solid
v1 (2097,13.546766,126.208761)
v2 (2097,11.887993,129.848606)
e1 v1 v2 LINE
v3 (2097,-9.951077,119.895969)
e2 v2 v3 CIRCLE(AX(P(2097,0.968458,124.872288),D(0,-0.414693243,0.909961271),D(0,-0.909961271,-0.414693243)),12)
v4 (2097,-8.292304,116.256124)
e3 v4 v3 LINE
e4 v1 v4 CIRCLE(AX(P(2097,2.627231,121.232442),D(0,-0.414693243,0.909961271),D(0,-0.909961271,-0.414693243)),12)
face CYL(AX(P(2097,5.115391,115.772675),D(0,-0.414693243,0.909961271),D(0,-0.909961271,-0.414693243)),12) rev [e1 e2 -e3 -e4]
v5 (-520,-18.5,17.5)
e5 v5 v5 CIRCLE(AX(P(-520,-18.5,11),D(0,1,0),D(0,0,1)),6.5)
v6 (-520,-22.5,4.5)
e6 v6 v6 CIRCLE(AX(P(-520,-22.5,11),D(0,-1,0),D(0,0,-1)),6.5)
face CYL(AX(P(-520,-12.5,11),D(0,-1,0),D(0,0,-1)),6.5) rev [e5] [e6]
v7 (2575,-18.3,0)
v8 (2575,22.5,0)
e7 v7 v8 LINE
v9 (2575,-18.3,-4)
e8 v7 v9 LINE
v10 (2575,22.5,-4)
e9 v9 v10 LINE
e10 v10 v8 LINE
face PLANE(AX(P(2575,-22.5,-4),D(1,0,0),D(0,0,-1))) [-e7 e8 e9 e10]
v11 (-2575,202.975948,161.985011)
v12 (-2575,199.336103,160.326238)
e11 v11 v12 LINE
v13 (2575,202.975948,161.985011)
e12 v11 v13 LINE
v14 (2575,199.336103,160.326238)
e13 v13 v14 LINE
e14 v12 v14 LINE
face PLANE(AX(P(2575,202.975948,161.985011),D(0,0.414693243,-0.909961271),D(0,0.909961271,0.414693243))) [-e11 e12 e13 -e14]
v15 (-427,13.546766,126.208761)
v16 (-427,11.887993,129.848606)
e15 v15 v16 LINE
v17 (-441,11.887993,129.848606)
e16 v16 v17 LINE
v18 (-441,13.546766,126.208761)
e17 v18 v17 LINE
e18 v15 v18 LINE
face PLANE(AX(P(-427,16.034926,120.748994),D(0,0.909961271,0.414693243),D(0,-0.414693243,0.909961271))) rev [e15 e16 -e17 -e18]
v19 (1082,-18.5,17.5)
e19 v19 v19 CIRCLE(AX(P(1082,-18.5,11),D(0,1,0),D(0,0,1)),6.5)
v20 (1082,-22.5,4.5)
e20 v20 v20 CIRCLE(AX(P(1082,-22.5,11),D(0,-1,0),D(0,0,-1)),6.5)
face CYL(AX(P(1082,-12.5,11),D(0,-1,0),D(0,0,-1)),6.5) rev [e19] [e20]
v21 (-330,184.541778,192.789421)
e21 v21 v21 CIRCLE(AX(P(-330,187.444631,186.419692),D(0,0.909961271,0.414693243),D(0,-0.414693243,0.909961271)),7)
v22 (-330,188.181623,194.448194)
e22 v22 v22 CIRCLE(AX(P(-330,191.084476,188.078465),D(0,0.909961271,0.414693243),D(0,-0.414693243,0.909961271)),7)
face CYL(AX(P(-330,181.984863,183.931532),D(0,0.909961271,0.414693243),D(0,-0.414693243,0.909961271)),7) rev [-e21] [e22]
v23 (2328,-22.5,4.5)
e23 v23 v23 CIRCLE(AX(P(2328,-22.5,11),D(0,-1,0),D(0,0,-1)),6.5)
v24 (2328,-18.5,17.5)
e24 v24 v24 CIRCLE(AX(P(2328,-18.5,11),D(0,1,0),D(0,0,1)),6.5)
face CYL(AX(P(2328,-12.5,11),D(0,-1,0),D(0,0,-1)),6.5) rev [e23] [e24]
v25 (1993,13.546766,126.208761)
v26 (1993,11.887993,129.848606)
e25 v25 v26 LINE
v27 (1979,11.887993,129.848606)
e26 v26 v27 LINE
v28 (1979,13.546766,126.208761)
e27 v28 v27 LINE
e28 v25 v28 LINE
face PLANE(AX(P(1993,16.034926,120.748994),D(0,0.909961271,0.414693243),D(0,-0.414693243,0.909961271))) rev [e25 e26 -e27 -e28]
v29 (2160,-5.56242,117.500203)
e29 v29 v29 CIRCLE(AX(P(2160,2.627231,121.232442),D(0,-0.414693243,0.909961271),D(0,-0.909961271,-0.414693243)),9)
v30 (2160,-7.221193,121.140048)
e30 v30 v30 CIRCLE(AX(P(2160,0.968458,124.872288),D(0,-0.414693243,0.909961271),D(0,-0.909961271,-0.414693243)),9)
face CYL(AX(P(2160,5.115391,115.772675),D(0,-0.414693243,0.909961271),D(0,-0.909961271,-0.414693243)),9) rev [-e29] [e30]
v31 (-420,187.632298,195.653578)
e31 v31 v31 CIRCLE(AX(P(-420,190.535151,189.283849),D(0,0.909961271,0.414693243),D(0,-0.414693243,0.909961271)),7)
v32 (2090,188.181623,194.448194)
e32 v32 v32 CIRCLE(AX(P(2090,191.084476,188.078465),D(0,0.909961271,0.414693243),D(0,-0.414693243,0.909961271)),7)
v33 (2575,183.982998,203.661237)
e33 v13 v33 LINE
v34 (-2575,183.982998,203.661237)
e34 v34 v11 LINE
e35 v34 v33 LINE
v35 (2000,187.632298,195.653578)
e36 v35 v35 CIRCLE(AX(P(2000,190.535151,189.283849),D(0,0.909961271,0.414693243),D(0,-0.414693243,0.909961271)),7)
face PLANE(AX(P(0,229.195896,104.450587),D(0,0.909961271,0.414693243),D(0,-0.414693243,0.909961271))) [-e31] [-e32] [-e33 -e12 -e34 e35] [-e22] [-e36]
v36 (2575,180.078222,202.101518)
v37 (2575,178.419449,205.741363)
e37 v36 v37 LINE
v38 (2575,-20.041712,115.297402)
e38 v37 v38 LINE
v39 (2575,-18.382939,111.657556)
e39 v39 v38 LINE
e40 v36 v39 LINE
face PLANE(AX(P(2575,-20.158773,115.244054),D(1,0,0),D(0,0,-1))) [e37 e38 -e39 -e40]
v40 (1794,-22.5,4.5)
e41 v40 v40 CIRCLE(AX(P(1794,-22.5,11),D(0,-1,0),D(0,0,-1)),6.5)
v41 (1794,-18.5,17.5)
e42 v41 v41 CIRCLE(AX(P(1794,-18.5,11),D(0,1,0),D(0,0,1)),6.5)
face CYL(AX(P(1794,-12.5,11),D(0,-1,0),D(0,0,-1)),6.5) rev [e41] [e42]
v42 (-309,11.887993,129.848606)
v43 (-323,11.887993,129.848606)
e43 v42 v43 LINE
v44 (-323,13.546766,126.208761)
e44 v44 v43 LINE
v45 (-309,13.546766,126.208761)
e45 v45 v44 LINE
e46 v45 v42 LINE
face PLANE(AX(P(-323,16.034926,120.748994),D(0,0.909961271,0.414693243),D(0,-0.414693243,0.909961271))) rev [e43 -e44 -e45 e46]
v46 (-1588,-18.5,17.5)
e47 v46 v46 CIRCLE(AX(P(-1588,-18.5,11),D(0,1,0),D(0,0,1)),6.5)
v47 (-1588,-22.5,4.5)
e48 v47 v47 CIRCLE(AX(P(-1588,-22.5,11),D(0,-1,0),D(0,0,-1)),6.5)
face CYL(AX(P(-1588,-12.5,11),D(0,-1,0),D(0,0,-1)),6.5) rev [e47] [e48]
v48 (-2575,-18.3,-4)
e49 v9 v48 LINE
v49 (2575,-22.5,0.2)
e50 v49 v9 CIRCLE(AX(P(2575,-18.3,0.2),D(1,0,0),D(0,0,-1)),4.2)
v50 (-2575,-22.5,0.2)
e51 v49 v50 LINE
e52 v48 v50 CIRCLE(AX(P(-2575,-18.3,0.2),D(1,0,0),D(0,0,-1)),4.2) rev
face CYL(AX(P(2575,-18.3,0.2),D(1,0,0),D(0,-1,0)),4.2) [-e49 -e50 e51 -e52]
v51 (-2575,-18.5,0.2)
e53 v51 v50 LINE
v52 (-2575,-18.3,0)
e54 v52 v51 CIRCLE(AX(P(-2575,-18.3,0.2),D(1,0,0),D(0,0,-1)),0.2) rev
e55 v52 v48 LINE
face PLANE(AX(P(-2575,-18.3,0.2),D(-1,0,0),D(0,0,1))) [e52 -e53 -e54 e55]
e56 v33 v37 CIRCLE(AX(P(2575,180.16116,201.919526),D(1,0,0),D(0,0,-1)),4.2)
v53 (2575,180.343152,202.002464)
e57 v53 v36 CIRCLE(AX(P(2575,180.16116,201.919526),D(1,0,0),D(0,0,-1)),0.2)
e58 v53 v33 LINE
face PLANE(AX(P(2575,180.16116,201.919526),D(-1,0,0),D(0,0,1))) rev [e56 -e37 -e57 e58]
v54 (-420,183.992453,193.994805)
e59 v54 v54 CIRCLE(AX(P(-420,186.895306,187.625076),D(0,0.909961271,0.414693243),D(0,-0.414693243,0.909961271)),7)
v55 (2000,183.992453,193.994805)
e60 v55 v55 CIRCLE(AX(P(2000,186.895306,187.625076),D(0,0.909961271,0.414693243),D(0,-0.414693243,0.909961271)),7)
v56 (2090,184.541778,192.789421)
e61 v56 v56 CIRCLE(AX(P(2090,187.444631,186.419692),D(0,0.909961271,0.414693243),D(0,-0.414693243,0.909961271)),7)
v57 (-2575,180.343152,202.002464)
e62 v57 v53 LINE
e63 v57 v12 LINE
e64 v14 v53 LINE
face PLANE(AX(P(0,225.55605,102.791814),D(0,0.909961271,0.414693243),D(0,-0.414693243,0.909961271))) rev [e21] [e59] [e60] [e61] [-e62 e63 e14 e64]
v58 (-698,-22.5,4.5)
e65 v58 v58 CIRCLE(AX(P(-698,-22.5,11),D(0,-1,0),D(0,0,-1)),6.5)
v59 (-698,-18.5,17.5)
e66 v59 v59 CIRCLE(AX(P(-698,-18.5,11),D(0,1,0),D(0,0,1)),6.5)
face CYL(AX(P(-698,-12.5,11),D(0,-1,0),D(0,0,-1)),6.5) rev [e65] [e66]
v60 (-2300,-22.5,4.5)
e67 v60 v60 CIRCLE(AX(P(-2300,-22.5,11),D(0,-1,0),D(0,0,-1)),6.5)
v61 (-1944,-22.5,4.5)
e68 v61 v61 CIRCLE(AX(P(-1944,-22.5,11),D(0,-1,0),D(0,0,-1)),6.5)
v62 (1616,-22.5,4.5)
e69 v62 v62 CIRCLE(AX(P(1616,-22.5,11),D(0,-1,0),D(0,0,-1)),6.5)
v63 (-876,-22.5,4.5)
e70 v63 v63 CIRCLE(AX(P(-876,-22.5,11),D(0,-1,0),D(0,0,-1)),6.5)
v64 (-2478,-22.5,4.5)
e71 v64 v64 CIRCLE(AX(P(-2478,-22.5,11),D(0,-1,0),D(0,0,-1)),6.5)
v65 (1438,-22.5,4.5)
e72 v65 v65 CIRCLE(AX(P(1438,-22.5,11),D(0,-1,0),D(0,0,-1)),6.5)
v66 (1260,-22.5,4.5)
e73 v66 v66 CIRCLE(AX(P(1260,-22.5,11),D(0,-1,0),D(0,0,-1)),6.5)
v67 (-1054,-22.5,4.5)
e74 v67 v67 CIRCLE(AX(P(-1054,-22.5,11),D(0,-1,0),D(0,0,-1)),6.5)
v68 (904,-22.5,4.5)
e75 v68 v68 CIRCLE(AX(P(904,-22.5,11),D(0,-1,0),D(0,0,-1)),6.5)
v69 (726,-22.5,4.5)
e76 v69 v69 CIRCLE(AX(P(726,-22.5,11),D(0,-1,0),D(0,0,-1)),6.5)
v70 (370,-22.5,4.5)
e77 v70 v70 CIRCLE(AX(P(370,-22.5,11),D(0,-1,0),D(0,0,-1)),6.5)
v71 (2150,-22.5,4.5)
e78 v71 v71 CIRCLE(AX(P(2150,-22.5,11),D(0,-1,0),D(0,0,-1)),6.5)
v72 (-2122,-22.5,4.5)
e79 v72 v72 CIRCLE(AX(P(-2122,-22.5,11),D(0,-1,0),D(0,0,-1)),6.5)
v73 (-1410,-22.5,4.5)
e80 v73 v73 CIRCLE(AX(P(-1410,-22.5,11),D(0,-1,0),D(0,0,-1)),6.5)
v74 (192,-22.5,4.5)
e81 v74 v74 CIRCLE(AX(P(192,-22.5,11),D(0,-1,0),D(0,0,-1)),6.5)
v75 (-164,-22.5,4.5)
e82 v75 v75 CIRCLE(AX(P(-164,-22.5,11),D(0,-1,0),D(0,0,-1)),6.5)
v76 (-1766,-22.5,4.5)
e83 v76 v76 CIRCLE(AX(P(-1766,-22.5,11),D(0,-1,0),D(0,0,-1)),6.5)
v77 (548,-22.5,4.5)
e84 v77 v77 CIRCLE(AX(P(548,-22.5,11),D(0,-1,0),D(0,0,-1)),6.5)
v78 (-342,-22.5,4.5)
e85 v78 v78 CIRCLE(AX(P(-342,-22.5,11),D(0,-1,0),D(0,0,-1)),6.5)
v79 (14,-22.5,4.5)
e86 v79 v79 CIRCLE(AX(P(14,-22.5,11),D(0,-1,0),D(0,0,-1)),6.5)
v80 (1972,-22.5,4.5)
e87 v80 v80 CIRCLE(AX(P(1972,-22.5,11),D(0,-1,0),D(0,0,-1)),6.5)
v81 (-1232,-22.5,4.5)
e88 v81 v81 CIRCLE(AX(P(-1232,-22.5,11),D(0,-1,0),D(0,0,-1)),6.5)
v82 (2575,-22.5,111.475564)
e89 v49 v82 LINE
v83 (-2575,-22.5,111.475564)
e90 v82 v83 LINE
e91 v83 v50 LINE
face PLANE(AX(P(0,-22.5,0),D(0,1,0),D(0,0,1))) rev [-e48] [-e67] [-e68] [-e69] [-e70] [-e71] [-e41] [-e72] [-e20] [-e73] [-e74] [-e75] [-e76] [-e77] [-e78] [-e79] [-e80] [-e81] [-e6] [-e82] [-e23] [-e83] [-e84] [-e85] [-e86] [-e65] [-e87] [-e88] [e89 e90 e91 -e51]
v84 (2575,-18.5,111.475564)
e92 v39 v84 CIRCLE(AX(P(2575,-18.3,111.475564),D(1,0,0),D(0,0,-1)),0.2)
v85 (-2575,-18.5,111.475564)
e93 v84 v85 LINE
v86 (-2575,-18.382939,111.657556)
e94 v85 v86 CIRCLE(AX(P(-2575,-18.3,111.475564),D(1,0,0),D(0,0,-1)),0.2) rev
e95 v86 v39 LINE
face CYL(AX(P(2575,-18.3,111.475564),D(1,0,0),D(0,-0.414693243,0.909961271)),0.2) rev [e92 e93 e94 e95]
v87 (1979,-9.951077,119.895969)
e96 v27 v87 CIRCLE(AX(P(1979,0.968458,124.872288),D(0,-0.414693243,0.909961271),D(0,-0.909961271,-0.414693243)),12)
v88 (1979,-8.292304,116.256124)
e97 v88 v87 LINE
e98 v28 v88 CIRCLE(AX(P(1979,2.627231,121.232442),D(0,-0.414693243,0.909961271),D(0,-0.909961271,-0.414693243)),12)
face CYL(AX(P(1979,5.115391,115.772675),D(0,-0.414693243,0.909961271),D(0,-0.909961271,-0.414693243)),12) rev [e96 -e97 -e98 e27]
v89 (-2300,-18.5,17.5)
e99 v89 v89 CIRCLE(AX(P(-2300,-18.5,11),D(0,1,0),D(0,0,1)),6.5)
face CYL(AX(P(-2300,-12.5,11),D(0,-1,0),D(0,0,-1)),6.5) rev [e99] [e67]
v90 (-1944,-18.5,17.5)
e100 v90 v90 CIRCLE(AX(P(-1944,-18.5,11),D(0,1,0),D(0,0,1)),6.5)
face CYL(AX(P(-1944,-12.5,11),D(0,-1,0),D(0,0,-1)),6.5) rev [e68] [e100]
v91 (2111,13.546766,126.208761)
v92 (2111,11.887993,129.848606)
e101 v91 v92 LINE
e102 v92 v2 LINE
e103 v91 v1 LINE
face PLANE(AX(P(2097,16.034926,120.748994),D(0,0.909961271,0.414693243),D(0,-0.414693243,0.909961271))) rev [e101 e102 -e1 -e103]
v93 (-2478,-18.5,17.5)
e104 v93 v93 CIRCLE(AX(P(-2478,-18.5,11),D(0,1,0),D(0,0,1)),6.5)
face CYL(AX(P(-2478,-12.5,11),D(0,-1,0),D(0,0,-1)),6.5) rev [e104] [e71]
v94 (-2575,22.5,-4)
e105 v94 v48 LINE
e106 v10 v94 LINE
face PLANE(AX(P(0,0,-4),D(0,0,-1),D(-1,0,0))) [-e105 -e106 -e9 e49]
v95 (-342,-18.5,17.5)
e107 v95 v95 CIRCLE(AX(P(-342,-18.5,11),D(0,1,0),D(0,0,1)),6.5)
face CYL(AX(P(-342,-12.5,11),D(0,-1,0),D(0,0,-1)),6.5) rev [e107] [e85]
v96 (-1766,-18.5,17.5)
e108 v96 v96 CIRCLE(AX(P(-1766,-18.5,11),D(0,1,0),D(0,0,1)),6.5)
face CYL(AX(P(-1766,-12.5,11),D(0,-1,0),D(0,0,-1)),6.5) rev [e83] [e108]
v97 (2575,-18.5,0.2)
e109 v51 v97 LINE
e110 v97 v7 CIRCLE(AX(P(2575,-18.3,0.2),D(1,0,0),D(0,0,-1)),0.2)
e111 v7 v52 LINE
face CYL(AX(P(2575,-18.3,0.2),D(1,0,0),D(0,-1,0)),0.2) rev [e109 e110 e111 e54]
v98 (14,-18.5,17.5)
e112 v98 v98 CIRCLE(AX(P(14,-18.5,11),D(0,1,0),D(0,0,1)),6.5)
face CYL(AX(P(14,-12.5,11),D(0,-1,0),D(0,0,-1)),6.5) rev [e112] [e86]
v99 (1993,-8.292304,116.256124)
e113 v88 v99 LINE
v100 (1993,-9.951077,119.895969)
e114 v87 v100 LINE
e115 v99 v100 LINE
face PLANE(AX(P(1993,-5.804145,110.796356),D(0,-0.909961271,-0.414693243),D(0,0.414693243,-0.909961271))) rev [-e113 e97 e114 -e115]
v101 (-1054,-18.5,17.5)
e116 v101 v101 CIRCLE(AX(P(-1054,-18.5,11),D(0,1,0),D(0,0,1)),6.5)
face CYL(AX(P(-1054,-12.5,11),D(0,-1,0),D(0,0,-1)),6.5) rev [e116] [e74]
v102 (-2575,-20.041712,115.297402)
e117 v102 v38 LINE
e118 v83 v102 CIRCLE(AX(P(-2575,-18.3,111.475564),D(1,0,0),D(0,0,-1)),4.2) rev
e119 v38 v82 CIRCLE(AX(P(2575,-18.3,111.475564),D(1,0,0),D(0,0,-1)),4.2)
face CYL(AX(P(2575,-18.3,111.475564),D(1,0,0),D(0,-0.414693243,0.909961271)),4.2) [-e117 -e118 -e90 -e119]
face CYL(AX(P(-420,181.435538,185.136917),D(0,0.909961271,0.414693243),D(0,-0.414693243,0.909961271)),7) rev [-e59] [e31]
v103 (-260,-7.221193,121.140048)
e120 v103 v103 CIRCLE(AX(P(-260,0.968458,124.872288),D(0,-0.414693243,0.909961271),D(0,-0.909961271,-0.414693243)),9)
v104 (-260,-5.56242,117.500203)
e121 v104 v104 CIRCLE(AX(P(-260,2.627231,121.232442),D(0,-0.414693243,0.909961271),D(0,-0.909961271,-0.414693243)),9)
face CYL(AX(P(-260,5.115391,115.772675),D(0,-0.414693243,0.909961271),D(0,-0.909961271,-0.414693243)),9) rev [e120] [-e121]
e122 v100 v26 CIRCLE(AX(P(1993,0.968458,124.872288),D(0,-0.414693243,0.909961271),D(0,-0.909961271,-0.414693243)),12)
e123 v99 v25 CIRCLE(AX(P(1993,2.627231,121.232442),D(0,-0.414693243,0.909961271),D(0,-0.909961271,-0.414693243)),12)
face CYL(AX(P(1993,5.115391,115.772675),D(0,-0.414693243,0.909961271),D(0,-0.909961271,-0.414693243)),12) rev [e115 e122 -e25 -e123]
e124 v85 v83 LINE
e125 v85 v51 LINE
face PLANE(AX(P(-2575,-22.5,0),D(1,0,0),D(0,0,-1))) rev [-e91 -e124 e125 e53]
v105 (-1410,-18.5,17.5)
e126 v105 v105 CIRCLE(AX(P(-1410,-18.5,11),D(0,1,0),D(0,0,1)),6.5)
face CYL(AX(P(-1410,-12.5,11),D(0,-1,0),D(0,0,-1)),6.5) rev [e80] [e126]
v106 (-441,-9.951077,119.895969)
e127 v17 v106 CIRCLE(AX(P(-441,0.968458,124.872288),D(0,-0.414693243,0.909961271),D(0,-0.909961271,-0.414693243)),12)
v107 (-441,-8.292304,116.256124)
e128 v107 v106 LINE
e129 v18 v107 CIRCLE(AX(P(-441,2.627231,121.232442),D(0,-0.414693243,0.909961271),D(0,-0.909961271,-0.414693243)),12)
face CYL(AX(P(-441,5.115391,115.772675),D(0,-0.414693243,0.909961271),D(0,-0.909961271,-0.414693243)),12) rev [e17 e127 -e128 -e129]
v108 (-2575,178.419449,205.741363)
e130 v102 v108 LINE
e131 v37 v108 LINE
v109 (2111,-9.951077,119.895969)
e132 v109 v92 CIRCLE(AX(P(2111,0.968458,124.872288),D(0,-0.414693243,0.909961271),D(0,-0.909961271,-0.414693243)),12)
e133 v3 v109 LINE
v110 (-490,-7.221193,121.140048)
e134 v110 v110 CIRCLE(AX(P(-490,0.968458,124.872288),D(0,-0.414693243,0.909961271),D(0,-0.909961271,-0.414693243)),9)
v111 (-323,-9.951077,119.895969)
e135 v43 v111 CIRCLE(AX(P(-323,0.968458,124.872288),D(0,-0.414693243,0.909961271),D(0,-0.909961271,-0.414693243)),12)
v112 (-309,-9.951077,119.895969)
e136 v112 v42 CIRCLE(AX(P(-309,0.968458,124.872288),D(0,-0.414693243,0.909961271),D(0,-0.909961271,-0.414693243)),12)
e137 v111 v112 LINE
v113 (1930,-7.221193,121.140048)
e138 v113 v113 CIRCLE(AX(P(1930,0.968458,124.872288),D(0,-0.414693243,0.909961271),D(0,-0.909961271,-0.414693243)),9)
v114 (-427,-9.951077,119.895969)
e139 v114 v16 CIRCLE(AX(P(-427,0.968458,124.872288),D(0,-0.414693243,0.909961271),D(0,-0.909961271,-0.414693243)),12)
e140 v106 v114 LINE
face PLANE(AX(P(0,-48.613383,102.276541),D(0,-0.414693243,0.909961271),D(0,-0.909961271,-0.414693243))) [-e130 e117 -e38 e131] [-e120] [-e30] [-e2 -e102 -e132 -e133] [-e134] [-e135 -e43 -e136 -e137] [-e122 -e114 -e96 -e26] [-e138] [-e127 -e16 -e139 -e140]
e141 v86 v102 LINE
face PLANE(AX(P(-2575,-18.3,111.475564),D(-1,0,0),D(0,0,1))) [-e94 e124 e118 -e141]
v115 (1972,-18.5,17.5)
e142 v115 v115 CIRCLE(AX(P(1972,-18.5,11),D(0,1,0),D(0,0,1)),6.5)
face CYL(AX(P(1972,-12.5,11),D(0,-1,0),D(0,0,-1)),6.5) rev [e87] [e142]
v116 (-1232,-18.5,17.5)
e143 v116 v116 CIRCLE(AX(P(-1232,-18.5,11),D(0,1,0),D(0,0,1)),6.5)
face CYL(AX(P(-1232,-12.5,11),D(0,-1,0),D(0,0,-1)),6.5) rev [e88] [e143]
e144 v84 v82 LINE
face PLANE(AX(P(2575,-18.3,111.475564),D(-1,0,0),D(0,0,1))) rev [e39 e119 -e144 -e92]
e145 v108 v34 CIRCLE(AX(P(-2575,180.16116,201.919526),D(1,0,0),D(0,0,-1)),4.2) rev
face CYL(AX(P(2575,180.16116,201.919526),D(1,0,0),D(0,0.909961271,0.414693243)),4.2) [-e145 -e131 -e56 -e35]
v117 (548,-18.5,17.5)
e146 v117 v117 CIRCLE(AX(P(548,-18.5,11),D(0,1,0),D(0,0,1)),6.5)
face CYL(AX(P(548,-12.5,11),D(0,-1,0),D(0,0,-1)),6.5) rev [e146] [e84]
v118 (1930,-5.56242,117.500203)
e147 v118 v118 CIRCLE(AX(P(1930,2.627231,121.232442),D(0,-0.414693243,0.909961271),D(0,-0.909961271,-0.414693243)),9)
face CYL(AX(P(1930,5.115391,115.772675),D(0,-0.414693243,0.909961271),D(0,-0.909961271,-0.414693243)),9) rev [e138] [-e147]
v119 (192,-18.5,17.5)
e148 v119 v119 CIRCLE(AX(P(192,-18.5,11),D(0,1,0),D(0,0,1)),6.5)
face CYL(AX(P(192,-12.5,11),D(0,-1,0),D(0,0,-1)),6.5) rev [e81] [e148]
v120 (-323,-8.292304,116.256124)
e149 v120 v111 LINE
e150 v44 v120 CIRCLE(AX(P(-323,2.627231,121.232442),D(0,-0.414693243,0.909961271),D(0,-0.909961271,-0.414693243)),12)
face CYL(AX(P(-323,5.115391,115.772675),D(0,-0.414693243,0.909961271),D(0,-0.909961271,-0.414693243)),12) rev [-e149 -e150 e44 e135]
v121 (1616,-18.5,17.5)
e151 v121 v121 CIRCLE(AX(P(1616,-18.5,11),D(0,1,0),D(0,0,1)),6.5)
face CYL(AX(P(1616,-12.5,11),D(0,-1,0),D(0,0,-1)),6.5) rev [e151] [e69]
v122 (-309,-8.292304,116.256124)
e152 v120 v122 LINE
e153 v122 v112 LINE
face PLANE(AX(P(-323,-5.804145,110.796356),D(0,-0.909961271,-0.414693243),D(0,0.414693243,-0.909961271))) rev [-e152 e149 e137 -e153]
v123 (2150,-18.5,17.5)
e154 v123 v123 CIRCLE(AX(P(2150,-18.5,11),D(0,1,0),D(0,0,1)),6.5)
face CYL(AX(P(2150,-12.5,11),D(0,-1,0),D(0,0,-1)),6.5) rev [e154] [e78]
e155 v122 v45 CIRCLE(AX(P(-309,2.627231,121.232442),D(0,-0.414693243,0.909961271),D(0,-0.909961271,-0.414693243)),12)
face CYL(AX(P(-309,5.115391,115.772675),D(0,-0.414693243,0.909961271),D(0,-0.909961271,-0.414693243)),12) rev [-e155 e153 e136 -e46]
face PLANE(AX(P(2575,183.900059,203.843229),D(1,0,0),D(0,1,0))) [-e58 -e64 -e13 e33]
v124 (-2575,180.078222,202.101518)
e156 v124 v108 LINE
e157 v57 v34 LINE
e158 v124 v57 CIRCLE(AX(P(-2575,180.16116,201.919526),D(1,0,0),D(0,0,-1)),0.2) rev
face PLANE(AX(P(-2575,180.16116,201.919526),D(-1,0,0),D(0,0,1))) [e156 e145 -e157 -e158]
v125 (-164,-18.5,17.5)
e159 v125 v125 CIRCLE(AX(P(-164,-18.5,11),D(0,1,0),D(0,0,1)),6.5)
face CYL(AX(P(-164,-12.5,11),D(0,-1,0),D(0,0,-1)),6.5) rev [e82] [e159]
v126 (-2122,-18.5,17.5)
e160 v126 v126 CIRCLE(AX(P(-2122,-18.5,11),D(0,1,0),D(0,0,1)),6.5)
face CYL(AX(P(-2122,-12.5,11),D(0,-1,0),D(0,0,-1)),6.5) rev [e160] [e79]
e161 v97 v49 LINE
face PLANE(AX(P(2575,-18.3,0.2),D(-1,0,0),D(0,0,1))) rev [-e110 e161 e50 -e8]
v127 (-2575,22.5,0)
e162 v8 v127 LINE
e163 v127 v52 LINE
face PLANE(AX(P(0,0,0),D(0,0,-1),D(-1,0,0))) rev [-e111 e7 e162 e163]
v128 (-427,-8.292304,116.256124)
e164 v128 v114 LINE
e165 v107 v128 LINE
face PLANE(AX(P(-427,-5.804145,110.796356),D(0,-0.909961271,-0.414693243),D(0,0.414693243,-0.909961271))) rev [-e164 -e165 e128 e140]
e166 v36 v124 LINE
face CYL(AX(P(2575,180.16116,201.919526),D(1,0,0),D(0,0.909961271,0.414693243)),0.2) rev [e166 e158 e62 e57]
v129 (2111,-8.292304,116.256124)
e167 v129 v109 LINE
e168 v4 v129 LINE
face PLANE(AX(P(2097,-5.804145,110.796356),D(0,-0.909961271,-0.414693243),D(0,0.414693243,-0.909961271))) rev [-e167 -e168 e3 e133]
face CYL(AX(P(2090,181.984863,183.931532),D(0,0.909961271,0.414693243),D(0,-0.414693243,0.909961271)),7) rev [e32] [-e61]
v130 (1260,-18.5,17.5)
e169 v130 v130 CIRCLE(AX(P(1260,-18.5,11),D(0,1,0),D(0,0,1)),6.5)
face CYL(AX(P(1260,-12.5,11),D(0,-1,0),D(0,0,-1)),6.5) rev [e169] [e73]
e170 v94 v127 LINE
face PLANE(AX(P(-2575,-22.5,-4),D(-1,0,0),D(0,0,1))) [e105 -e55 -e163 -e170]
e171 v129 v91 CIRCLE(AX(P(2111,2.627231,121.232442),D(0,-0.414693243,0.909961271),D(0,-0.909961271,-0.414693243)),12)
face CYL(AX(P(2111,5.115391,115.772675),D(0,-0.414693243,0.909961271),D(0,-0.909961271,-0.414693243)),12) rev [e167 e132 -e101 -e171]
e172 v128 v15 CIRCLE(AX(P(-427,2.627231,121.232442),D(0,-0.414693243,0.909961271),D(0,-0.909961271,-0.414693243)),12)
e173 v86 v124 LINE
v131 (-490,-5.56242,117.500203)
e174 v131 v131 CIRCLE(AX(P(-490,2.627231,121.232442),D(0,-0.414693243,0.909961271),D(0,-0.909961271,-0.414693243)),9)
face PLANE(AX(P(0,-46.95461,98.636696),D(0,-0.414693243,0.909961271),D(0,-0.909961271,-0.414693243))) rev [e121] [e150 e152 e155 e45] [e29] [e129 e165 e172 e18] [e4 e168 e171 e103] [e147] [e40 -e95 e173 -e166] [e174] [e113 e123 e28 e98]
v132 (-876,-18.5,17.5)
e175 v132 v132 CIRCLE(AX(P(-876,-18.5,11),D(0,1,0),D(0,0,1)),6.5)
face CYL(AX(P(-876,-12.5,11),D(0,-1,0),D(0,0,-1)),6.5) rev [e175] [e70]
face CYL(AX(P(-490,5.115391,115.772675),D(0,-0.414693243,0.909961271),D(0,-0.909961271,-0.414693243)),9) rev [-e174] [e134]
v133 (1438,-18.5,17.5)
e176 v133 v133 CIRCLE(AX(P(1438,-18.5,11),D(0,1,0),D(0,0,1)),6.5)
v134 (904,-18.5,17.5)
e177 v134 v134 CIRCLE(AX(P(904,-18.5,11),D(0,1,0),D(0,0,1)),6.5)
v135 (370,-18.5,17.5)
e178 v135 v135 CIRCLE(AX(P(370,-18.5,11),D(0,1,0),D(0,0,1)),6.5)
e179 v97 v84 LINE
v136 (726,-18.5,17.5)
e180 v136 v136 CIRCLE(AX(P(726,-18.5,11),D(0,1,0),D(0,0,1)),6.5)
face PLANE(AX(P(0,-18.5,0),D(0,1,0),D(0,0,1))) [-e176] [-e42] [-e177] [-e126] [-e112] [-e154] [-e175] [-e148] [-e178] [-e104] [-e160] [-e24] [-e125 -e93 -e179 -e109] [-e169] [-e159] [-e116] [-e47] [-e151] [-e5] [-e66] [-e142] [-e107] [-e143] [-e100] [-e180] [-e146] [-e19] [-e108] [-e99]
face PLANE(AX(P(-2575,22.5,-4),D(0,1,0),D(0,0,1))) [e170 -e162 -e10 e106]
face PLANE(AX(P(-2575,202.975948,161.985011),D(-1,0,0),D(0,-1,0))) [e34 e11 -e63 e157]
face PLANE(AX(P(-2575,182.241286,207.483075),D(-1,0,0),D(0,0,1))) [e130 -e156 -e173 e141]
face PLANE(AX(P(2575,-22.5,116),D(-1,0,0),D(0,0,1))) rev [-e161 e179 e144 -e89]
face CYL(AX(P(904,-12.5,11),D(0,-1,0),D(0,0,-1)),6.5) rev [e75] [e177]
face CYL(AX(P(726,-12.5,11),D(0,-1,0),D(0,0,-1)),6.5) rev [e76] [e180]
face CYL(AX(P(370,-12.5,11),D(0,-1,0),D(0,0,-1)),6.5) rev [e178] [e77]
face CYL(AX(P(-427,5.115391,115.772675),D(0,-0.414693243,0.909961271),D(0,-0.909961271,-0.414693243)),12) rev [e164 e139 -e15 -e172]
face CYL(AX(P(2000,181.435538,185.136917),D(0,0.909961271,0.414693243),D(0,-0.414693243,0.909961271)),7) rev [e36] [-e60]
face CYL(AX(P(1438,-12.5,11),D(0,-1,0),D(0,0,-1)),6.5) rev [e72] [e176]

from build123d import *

# Parameters (mm, degrees)
SKETCH1_W                    = 5150
SKETCH1_H                    = 45
BASE_FLANGE1_DEPTH           = 4
EDGE_FLANGE1_STRIP_W         = 16.4
EDGE_FLANGE1_STRIP_H         = 4
EDGE_FLANGE1_STRIP_CUT_DEPTH = 5150
EDGE_FLANGE1_DEPTH           = 5150
EDGE_FLANGE2_START           = -2575
EDGE_FLANGE2_DEPTH           = 5150
EDGE_FLANGE2_2_DEPTH         = 5150
EDGE_FLANGE3_STRIP_W         = 16.4
EDGE_FLANGE3_STRIP_H         = 4
EDGE_FLANGE3_STRIP_CUT_DEPTH = 5150
EDGE_FLANGE3_DEPTH           = 5150
SKETCH15_R                   = 7
CUT_EXTRUDE1_DEPTH           = 10
SKETCH17_R                   = 6.5
CUT_EXTRUDE3_DEPTH           = 10
LPATTERN1_COUNT              = 28
LPATTERN1_PITCH              = 178
SKETCH18_R                   = 9
CUT_EXTRUDE4_DEPTH           = 10
LPATTERN2_COUNT              = 2
LPATTERN2_PITCH              = 2420
LPATTERN3_COUNT              = 2
LPATTERN3_PITCH              = 2420


# Read off the part's stored shape, not the designer's step: Edge-Flange2
# Sheet-metal steps are written as plain solids
with BuildPart() as part:
    # Sketch1 → Base-Flange1 (new body)
    with BuildSketch(Plane.XY):
        Rectangle(SKETCH1_W, SKETCH1_H)
    extrude(amount=-BASE_FLANGE1_DEPTH)

    # Edge-Flange1 strip (across the edge) → Edge-Flange1 strip cut (cut)
    with BuildSketch(Plane(origin=(-2575, -22.5, 0), x_dir=(0, 1, 0), z_dir=(1, 0, 0))):
        with Locations((-4, -2)):
            Rectangle(EDGE_FLANGE1_STRIP_W, EDGE_FLANGE1_STRIP_H)
    extrude(amount=EDGE_FLANGE1_STRIP_CUT_DEPTH, mode=Mode.SUBTRACT)

    # Edge-Flange1 section (across the edge) → Edge-Flange1 (add)
    with BuildSketch(Plane(origin=(-2575, -22.5, 0), x_dir=(0, 1, 0), z_dir=(1, 0, 0))):
        with BuildLine():
            Line((0, 0.2), (0, 116))
            Line((0, 116), (4, 116))
            Line((4, 116), (4, 0.2))
            ThreePointArc((4, 0.2), (4.058578644, 0.058578644), (4.2, 0))
            Line((4.2, 0), (4.2, -4))
            ThreePointArc((4.2, -4), (1.230151519, -2.769848481), (0, 0.2))
        make_face()
    extrude(amount=EDGE_FLANGE1_DEPTH)

    # Edge-Flange2 outline → Edge-Flange2 (cut)
    with BuildSketch(Plane.YZ.offset(EDGE_FLANGE2_START)):
        with BuildLine():
            ThreePointArc((-22.5, 111.475564199), (-21.832363854, 113.747656979), (-20.041711619, 115.297401537))
            Line((-20.041711619, 115.297401537), (-18.5, 116))
            Line((-18.5, 116), (-22.5, 116))
            Line((-22.5, 116), (-22.5, 111.475564199))
        make_face()
    extrude(amount=EDGE_FLANGE2_DEPTH, mode=Mode.SUBTRACT)

    # Edge-Flange2 2 outline → Edge-Flange2 2 (add)
    with BuildSketch(Plane.YZ.offset(EDGE_FLANGE2_START)):
        with BuildLine():
            Line((182.241285947, 207.483074576), (-18.5, 116))
            Line((-18.5, 116), (-18.5, 111.475564199))
            ThreePointArc((-18.5, 111.475564199), (-18.468207803, 111.583759093), (-18.382938649, 111.657556453))
            Line((-18.382938649, 111.657556453), (183.900058918, 203.843229492))
            Line((183.900058918, 203.843229492), (182.241285947, 207.483074576))
        make_face()
    extrude(amount=EDGE_FLANGE2_2_DEPTH)

    # Edge-Flange3 strip (across the edge) → Edge-Flange3 strip cut (cut)
    with BuildSketch(Plane(origin=(-2575, 183.900058918, 203.843229492), x_dir=(0, -0.9099612708765384, -0.41469324265624946), z_dir=(1, 0, 0))):
        with Locations((-4, -2)):
            Rectangle(EDGE_FLANGE3_STRIP_W, EDGE_FLANGE3_STRIP_H)
    extrude(amount=EDGE_FLANGE3_STRIP_CUT_DEPTH, mode=Mode.SUBTRACT)

    # Edge-Flange3 section (across the edge) → Edge-Flange3 (add)
    with BuildSketch(Plane(origin=(-2575, 183.900058918, 203.843229492), x_dir=(0, -0.9099612708765384, -0.41469324265624946), z_dir=(1, 0, 0))):
        with BuildLine():
            Line((0, 0.2), (0, 46))
            Line((0, 46), (4, 46))
            Line((4, 46), (4, 0.2))
            ThreePointArc((4, 0.2), (4.058578644, 0.058578644), (4.2, 0))
            Line((4.2, 0), (4.2, -4))
            ThreePointArc((4.2, -4), (1.230151519, -2.769848481), (0, 0.2))
        make_face()
    extrude(amount=EDGE_FLANGE3_DEPTH)

    # Sketch15 → Cut-Extrude1 (cut)
    with BuildSketch(Plane(origin=(0, 229.195895582, 104.450587277), x_dir=(1, 0, 0), z_dir=(0, 0.9099612708765382, 0.4146932426562498))):
        with Locations(Location((-420, -93.227332411, 0), (0, 0, 270))):
            Circle(SKETCH15_R)
        with Locations(Location((-330, -91.902677897, 0), (0, 0, 270))):
            Circle(SKETCH15_R)
    cut_extrude1 = extrude(amount=-CUT_EXTRUDE1_DEPTH, mode=Mode.SUBTRACT)

    # Sketch17 → Cut-Extrude3 (cut)
    with BuildSketch(Plane.XZ.offset(22.5)):
        with Locations(Location((-2478, 11, 0), (0, 0, 270))):
            Circle(SKETCH17_R)
    cut_extrude3 = extrude(amount=-CUT_EXTRUDE3_DEPTH, mode=Mode.SUBTRACT)

    # LPattern1: Cut-Extrude3 ×28
    with Locations(*[(i * LPATTERN1_PITCH, 0, 0) for i in range(1, LPATTERN1_COUNT)]):
        add(cut_extrude3, mode=Mode.SUBTRACT)

    # Sketch18 → Cut-Extrude4 (cut)
    with BuildSketch(Plane(origin=(0, -46.954609635, 103.032487299), x_dir=(1, 0, 0), z_dir=(0, -0.4146932426562464, 0.90996127087654))):
        with Locations(Location((-260, 52.664953269, 0), (0, 0, 270))):
            Circle(SKETCH18_R)
        with Locations(Location((-490, 52.664953269, 0), (0, 0, 270))):
            Circle(SKETCH18_R)
        with BuildLine():
            Line((-427, 40.664953269), (-441, 40.664953269))
            ThreePointArc((-441, 40.664953269), (-453, 52.664953269), (-441, 64.664953269))
            Line((-441, 64.664953269), (-427, 64.664953269))
            ThreePointArc((-427, 64.664953269), (-415, 52.664953269), (-427, 40.664953269))
        make_face()
        with BuildLine():
            Line((-323, 64.664953269), (-309, 64.664953269))
            ThreePointArc((-309, 64.664953269), (-297, 52.664953269), (-309, 40.664953269))
            Line((-309, 40.664953269), (-323, 40.664953269))
            ThreePointArc((-323, 40.664953269), (-335, 52.664953269), (-323, 64.664953269))
        make_face()
    cut_extrude4 = extrude(amount=-CUT_EXTRUDE4_DEPTH, mode=Mode.SUBTRACT)

    # LPattern2: Cut-Extrude1 ×2
    with Locations(*[(i * LPATTERN2_PITCH, 0, 0) for i in range(1, LPATTERN2_COUNT)]):
        add(cut_extrude1, mode=Mode.SUBTRACT)

    # LPattern3: Cut-Extrude4 ×2
    with Locations(*[(i * LPATTERN3_PITCH, 0, 0) for i in range(1, LPATTERN3_COUNT)]):
        add(cut_extrude4, mode=Mode.SUBTRACT)


solid = part.part
